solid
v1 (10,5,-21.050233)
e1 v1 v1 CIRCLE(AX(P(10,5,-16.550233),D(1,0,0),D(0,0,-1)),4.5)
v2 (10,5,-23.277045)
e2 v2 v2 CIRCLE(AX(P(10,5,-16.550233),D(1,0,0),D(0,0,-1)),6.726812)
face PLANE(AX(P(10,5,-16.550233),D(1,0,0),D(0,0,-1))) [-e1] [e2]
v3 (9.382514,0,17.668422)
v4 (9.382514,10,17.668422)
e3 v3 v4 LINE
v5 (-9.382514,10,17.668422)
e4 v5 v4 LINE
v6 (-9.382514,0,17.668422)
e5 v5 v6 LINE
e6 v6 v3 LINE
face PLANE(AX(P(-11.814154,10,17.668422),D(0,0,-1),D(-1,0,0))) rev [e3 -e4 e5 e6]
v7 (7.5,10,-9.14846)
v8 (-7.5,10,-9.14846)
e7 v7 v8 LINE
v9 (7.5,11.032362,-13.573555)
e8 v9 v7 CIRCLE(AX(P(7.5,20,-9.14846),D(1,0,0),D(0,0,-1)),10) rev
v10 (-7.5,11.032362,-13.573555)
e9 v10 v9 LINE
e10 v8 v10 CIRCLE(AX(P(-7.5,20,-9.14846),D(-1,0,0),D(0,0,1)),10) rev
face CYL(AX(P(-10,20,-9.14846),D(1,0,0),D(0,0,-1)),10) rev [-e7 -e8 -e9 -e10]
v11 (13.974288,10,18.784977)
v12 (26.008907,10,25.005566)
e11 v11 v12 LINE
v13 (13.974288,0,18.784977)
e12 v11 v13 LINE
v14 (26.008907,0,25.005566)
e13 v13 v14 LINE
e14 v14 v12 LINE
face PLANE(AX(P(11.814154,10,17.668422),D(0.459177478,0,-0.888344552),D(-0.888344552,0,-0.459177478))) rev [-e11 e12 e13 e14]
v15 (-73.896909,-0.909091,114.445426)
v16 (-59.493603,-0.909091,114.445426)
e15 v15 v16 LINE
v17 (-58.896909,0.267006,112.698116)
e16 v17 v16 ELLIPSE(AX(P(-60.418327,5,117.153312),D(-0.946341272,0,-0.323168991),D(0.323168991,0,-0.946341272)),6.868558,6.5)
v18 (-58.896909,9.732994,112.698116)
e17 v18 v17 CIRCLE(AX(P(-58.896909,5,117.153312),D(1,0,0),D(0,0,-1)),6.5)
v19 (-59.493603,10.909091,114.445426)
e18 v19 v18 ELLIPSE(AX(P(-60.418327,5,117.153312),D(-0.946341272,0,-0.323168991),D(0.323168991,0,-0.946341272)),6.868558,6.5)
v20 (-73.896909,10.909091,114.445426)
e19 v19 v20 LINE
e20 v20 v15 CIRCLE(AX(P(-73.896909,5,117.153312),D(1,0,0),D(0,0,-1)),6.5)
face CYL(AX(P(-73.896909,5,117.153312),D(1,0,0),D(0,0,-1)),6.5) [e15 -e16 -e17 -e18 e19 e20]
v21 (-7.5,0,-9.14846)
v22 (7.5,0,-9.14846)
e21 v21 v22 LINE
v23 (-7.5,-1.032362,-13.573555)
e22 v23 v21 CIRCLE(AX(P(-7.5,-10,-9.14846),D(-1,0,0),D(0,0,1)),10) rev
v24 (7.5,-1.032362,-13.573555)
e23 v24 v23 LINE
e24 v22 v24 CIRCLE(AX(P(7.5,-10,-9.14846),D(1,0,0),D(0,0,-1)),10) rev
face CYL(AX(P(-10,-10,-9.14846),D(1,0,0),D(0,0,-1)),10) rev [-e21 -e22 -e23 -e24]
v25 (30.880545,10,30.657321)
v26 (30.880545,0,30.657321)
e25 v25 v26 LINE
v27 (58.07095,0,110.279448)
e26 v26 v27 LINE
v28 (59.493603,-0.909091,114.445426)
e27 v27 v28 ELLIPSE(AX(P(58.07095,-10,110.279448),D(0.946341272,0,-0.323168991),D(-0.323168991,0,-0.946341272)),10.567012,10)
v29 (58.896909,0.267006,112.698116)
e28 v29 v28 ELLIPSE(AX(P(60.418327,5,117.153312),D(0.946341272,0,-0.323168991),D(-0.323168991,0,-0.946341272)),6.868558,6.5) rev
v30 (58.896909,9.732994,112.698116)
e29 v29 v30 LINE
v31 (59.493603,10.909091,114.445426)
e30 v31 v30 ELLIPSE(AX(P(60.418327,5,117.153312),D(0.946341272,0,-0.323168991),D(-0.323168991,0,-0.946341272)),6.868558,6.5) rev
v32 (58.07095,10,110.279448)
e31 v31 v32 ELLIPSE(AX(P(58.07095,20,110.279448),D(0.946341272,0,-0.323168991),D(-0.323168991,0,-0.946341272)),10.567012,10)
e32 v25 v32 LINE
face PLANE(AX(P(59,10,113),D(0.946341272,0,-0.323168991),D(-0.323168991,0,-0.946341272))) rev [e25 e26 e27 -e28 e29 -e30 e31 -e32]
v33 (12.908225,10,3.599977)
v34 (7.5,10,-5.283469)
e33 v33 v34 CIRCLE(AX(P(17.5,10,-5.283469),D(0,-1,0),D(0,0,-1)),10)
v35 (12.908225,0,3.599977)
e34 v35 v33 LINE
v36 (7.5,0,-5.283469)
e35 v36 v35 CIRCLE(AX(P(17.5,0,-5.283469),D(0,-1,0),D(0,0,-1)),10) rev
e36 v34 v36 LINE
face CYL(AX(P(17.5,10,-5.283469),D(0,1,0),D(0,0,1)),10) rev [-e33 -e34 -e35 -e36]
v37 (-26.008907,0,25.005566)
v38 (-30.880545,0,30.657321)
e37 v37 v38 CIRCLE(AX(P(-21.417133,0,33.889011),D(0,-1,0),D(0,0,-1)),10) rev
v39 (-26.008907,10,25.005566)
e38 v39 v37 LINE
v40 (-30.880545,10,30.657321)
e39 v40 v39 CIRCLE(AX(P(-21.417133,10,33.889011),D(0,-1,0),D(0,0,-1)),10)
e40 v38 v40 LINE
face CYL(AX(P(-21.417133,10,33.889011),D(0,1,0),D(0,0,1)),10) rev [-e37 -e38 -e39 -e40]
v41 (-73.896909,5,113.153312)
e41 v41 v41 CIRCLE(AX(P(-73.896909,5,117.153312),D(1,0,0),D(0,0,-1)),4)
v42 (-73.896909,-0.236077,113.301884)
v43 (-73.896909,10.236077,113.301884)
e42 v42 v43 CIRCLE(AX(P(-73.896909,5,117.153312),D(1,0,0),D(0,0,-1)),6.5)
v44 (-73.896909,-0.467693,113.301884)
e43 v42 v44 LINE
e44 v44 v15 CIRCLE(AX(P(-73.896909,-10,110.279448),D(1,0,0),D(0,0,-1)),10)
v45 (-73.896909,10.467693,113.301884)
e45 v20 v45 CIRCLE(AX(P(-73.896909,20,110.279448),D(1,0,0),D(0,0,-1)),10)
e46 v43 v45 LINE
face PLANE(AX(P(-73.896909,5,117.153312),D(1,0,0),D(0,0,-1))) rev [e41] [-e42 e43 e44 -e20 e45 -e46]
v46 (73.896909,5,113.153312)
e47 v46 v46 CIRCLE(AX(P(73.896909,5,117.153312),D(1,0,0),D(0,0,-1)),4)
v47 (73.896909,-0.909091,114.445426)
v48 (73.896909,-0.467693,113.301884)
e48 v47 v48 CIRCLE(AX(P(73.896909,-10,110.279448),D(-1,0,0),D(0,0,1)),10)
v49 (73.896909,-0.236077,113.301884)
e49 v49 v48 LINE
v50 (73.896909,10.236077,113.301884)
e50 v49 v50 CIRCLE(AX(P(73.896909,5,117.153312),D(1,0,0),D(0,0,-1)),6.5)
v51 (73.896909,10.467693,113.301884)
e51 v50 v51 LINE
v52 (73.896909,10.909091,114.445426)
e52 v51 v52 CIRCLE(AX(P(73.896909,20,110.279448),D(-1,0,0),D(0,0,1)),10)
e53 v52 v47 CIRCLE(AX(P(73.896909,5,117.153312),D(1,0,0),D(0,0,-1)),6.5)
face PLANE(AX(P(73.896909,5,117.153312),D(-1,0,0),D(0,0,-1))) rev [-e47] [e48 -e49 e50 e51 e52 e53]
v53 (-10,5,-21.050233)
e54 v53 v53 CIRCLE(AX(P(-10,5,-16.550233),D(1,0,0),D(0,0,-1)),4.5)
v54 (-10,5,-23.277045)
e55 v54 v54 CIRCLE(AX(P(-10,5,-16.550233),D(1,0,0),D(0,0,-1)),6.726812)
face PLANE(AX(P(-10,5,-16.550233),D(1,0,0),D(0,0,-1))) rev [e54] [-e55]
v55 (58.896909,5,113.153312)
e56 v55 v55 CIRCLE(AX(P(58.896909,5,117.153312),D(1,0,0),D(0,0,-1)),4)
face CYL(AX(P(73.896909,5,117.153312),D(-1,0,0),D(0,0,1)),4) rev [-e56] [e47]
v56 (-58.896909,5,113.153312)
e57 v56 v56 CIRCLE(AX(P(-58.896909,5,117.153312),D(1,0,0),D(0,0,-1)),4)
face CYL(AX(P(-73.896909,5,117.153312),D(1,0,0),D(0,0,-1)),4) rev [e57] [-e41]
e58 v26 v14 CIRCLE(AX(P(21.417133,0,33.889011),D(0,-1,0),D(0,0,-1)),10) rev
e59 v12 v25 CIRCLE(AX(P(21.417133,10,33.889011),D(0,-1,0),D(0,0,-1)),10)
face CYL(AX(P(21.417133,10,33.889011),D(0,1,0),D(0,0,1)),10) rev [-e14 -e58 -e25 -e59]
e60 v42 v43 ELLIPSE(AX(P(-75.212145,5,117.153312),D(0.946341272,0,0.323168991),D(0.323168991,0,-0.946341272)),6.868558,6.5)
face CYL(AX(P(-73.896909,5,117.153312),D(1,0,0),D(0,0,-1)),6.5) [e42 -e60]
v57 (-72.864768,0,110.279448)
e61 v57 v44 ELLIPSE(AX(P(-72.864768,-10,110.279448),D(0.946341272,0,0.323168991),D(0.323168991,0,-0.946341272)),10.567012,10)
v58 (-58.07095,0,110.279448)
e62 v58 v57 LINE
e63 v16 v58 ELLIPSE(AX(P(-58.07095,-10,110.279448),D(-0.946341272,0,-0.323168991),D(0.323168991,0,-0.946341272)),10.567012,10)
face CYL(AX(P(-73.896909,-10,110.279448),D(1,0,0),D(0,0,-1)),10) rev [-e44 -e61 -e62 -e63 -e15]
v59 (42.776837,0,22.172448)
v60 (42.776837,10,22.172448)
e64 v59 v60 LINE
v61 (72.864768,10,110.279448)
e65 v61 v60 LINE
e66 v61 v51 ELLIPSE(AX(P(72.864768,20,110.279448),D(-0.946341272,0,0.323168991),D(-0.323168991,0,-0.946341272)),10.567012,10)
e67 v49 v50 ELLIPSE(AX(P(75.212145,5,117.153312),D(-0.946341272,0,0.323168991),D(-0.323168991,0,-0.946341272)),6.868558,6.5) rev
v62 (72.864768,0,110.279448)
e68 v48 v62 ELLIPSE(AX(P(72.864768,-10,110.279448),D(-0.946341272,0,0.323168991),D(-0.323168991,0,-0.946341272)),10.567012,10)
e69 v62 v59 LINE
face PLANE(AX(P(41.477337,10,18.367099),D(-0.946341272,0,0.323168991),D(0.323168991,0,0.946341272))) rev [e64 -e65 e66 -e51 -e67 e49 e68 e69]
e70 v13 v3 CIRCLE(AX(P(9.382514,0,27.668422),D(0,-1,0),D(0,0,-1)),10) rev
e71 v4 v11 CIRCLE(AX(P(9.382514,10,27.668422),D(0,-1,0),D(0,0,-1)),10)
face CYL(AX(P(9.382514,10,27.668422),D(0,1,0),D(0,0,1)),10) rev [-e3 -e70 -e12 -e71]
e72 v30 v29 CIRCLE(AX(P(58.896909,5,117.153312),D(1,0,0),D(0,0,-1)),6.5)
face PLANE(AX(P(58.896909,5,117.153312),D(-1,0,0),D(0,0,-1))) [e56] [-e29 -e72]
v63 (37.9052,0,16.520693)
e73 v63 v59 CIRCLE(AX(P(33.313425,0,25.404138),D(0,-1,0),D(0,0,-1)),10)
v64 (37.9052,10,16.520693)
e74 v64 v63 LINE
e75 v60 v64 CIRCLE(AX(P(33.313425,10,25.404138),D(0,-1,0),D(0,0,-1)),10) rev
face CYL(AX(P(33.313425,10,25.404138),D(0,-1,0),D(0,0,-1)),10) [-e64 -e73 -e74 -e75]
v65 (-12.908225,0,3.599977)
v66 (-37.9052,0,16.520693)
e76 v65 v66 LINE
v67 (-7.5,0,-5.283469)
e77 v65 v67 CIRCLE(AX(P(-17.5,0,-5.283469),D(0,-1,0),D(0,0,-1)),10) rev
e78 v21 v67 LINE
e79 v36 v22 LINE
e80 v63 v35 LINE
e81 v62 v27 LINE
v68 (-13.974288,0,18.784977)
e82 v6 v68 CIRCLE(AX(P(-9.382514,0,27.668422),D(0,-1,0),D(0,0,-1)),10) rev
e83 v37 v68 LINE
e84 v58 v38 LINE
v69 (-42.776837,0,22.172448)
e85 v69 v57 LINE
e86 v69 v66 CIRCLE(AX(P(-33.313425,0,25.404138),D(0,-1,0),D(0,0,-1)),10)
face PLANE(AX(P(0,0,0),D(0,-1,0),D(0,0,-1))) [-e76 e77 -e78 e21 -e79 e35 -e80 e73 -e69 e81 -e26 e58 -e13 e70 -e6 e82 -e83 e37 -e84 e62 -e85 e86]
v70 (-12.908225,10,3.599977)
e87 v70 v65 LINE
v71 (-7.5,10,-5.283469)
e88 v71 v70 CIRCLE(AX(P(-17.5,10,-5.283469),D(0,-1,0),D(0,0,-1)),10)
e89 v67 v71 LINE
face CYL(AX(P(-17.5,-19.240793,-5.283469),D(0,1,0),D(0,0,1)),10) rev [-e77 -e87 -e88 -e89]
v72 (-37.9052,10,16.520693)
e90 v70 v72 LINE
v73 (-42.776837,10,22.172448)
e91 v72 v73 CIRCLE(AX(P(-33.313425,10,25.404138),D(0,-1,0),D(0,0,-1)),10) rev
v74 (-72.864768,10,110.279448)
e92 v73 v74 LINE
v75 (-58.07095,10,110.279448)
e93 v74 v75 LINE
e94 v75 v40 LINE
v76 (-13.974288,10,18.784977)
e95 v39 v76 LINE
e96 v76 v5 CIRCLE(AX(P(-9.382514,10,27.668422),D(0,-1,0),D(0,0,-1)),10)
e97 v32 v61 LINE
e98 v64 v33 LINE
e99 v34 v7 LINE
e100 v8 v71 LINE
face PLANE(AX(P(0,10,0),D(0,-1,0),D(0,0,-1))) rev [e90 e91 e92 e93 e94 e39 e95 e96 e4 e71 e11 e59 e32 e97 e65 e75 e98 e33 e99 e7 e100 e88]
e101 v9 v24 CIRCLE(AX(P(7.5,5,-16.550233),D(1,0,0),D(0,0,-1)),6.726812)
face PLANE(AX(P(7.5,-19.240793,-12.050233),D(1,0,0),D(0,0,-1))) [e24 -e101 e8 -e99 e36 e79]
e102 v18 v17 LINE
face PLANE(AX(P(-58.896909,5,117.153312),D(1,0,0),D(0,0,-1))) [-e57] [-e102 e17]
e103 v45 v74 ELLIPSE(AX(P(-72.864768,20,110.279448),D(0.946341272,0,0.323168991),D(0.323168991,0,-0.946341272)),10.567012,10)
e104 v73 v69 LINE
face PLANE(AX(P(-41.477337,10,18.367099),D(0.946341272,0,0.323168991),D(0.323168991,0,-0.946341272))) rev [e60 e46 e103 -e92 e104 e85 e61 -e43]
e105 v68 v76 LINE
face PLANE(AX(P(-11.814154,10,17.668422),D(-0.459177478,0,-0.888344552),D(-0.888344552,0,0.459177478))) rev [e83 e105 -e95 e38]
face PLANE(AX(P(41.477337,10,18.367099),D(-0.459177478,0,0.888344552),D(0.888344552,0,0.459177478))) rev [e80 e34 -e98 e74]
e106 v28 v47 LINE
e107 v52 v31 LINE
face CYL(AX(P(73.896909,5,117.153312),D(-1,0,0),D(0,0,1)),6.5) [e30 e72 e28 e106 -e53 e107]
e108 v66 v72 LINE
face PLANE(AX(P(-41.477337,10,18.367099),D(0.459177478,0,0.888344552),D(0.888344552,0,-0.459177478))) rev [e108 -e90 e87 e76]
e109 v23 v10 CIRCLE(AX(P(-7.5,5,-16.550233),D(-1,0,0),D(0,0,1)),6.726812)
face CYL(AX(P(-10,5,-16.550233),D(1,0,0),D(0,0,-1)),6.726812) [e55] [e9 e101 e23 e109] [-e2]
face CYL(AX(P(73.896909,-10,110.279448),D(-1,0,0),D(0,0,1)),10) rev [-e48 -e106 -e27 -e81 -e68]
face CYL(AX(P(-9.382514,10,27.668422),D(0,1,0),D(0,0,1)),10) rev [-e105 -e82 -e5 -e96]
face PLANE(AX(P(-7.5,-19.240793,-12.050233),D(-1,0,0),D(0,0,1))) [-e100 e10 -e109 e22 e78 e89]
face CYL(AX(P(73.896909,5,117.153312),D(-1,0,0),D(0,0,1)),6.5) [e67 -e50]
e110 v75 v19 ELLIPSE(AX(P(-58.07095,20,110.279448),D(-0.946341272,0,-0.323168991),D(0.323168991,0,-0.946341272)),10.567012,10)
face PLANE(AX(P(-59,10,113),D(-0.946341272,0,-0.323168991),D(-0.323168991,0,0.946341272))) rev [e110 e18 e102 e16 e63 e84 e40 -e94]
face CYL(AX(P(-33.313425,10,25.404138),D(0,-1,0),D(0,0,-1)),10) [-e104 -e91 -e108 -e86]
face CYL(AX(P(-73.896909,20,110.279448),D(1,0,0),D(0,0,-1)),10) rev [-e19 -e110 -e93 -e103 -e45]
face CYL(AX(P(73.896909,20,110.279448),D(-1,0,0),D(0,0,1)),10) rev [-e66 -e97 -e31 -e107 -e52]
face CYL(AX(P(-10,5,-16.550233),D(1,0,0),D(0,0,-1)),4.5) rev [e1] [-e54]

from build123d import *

# Parameters (mm, degrees)
BOSS_EXTRUDE1_DEPTH      = 10
SKETCH3_R                = 6.5
SKETCH3_R_2              = 4
BOSS_EXTRUDE3_DEPTH      = 7.5
SKETCH7_W                = 15
SKETCH7_H                = 12.050233058
BOSS_EXTRUDE4_DEPTH      = 10
BOSS_EXTRUDE5_DEPTH      = 10
BOSS_EXTRUDE5_DEPTH_BACK = 10
SKETCH9_R                = 6.726812024
SKETCH9_R_2              = 4.5
FILLET1_R                = 10
FILLET2_R                = 10
FILLET3_R                = 10
FILLET4_R                = 10


with BuildPart() as part:
    # Sketch1 → Boss-Extrude1 (new body)
    with BuildSketch(Plane(origin=(0, 0, 0), x_dir=(1, 0, 0), z_dir=(0, 1, 0))):
        Polygon((-11.814153955, -17.668422436), (-29.581045004, -26.851971991), (-59, -113), (-73.793817424, -113), (-41.477337097, -18.36709911), (-5.943554998, 0), (5.943554998, 0), (41.477337097, -18.36709911), (73.793817424, -113), (59, -113), (29.581045004, -26.851971991), (11.814153955, -17.668422436), align=None)
    extrude(amount=BOSS_EXTRUDE1_DEPTH)

    # Sketch3 → Boss-Extrude3 (add, symmetric)
    with BuildSketch(Plane(origin=(-66.396908712, 0, 0), x_dir=(0, 0, -1), z_dir=(1, 0, 0))):
        with Locations((-117.153311931, 5)):
            Circle(SKETCH3_R)
        with Locations((-117.153311931, 5)):
            Circle(SKETCH3_R_2, mode=Mode.SUBTRACT)
    boss_extrude3 = extrude(amount=BOSS_EXTRUDE3_DEPTH, both=True)

    # Mirror3: Boss-Extrude3 across plane
    add(boss_extrude3.mirror(Plane(origin=(0, 0, 0), x_dir=(0, 0, 1), z_dir=(1, 0, 0))))

    # Sketch7 → Boss-Extrude4 (add)
    with BuildSketch(Plane(origin=(0, 10, 0), x_dir=(1, 0, 0), z_dir=(0, 1, 0))):
        with Locations((0, 6.025116529)):
            Rectangle(SKETCH7_W, SKETCH7_H)
    extrude(amount=-BOSS_EXTRUDE4_DEPTH)

    # Sketch9 → Boss-Extrude5 (add, two sides: drawn at the far end of the back side and taken through both)
    with BuildSketch(Plane(origin=(0, 0, 0), x_dir=(0, 0, -1), z_dir=(1, 0, 0)).offset(-BOSS_EXTRUDE5_DEPTH_BACK)):
        with Locations((16.550233058, 5)):
            Circle(SKETCH9_R)
        with Locations((16.550233058, 5)):
            Circle(SKETCH9_R_2, mode=Mode.SUBTRACT)
    extrude(amount=BOSS_EXTRUDE5_DEPTH + BOSS_EXTRUDE5_DEPTH_BACK)

    # Fillet1
    # the kernel refuses this fillet: 10 mm, written as the material it adds along each edge
    with BuildSketch(Plane(origin=(-5.943554998, 0, 0), x_dir=(-0.88834455248328, 0, 0.4591774777504672), z_dir=(0, 1, 0))) as fillet1_piece_1:
        with BuildLine():
            CenterArc((5.095194407, -10), FILLET1_R, 90, 21.792944461)
            Line((1.382659439, -0.71468449), (0, 0))
            Line((0, 0), (5.095194407, 0))
        make_face()
    extrude(amount=10)

    # Fillet2
    # the kernel refuses this fillet: 10 mm, written as the material it adds along each edge
    with BuildSketch(Plane(origin=(5.943554998, 0, 0), x_dir=(0.8883445524832799, 0, 0.4591774777504676), z_dir=(0, 1, 0))) as fillet2_piece_1:
        with BuildLine():
            CenterArc((5.095194407, 10), FILLET2_R, 248.207055539, 21.792944461)
            Line((1.382659439, 0.71468449), (0, 0))
            Line((0, 0), (5.095194407, 0))
        make_face()
    extrude(amount=10)

    # Fillet3
    # the kernel refuses this fillet: 10 mm, written as the material it adds along each edge
    with BuildSketch(Plane(origin=(11.814153955, 0, 17.668422436), x_dir=(0.8883445524832799, 0, 0.4591774777504676), z_dir=(0, 1, 0)), Plane(origin=(-11.814153955, 0, 17.668422436), x_dir=(1, 0, 0), z_dir=(0, 1, 0))) as fillet3_piece_1:
        with BuildLine():
            CenterArc((FILLET3_R * 0.243164033357, -FILLET3_R), FILLET3_R, 90, 27.334044372)
            Line((-FILLET3_R * 0.216013444393, -FILLET3_R * 0.111655447517), (0, 0))
            Line((0, 0), (FILLET3_R * 0.243164033357, 0))
        make_face()
    extrude(amount=10)
    with BuildSketch(Plane(origin=(29.581045004, 0, 26.851971991), x_dir=(0.3231689910588884, 0, 0.946341272067313), z_dir=(0, 1, 0)), Plane(origin=(-29.581045004, 0, 26.851971991), x_dir=(0.8883445524832806, 0, -0.4591774777504663), z_dir=(0, 1, 0))) as fillet3_piece_2:
        with BuildLine():
            CenterArc((FILLET3_R * 0.402111719604, -FILLET3_R), FILLET3_R, 90, 43.811274916)
            Line((-FILLET3_R * 0.290173472026, -FILLET3_R * 0.278375988862), (0, 0))
            Line((0, 0), (FILLET3_R * 0.402111719604, 0))
        make_face()
    extrude(amount=10)
    with BuildSketch(Plane(origin=(-52.198620973, 10, 113), x_dir=(0, 0, -1), z_dir=(-1, 0, 0))) as fillet3_piece_3_section:
        with BuildLine():
            CenterArc((2.720551611, -10), FILLET3_R, 90, 24.619977329)
            ThreePointArc((-1.445426294, -0.909090909), (-0.692731114, -0.502215954), (0, 0))
            Line((0, 0), (2.720551611, 0))
        make_face()
    fillet3_piece_3 = extrude(amount=28.396575479, mode=Mode.PRIVATE)
    fillet3_piece_3 = split(fillet3_piece_3, bisect_by=Plane(origin=(-58.289676239, 10, 110.919946807), z_dir=(-0.9463412720673133, 0, -0.3231689910588876)), keep=Keep.TOP, mode=Mode.PRIVATE)
    fillet3_piece_3 = split(fillet3_piece_3, bisect_by=Plane(origin=(-71.538454048, 10, 106.395580932), z_dir=(0.9463412720673133, 0, 0.3231689910588875)), keep=Keep.TOP, mode=Mode.PRIVATE)
    fillet3_piece_3 = split(fillet3_piece_3, bisect_by=Plane(origin=(-73.896908712, 10, 113), z_dir=(1, 0, 0)), keep=Keep.TOP, mode=Mode.PRIVATE)
    add(fillet3_piece_3)
    with BuildSketch(Plane(origin=(80.595196452, 10, 113), x_dir=(0, 0, -1), z_dir=(-1, 0, 0))) as fillet3_piece_4_section:
        with BuildLine():
            CenterArc((2.720551611, -10), FILLET3_R, 90, 24.619977329)
            ThreePointArc((-1.445426294, -0.909090909), (-0.692731114, -0.502215954), (0, 0))
            Line((0, 0), (2.720551611, 0))
        make_face()
    fillet3_piece_4 = extrude(amount=28.396575479, mode=Mode.PRIVATE)
    fillet3_piece_4 = split(fillet3_piece_4, bisect_by=Plane(origin=(74.504141186, 10, 115.080053193), z_dir=(-0.9463412720673132, 0, 0.32316899105888797)), keep=Keep.TOP, mode=Mode.PRIVATE)
    fillet3_piece_4 = split(fillet3_piece_4, bisect_by=Plane(origin=(61.255363377, 10, 119.604419068), z_dir=(0.9463412720673132, 0, -0.32316899105888797)), keep=Keep.TOP, mode=Mode.PRIVATE)
    fillet3_piece_4 = split(fillet3_piece_4, bisect_by=Plane(origin=(73.896908712, 10, 113), z_dir=(-1, 0, 0)), keep=Keep.TOP, mode=Mode.PRIVATE)
    add(fillet3_piece_4)
    with BuildSketch(Plane(origin=(80.595196452, 0, 113), x_dir=(0, 0, -1), z_dir=(-1, 0, 0))) as fillet3_piece_5_section:
        with BuildLine():
            CenterArc((2.720551611, 10), FILLET3_R, 245.380022671, 24.619977329)
            ThreePointArc((-1.445426294, 0.909090909), (-0.692731114, 0.502215954), (0, 0))
            Line((0, 0), (2.720551611, 0))
        make_face()
    fillet3_piece_5 = extrude(amount=28.396575479, mode=Mode.PRIVATE)
    fillet3_piece_5 = split(fillet3_piece_5, bisect_by=Plane(origin=(74.504141186, 0, 115.080053193), z_dir=(-0.9463412720673132, 0, 0.32316899105888797)), keep=Keep.TOP, mode=Mode.PRIVATE)
    fillet3_piece_5 = split(fillet3_piece_5, bisect_by=Plane(origin=(61.255363377, 0, 119.604419068), z_dir=(0.9463412720673132, 0, -0.32316899105888797)), keep=Keep.TOP, mode=Mode.PRIVATE)
    fillet3_piece_5 = split(fillet3_piece_5, bisect_by=Plane(origin=(73.896908712, 0, 113), z_dir=(-1, 0, 0)), keep=Keep.TOP, mode=Mode.PRIVATE)
    add(fillet3_piece_5)
    with BuildSketch(Plane(origin=(-52.198620973, 0, 113), x_dir=(0, 0, -1), z_dir=(-1, 0, 0))) as fillet3_piece_6_section:
        with BuildLine():
            CenterArc((2.720551611, 10), FILLET3_R, 245.380022671, 24.619977329)
            ThreePointArc((-1.445426294, 0.909090909), (-0.692731114, 0.502215954), (0, 0))
            Line((0, 0), (2.720551611, 0))
        make_face()
    fillet3_piece_6 = extrude(amount=28.396575479, mode=Mode.PRIVATE)
    fillet3_piece_6 = split(fillet3_piece_6, bisect_by=Plane(origin=(-58.289676239, 0, 110.919946807), z_dir=(-0.9463412720673133, 0, -0.3231689910588876)), keep=Keep.TOP, mode=Mode.PRIVATE)
    fillet3_piece_6 = split(fillet3_piece_6, bisect_by=Plane(origin=(-71.538454048, 0, 106.395580932), z_dir=(0.9463412720673133, 0, 0.3231689910588875)), keep=Keep.TOP, mode=Mode.PRIVATE)
    fillet3_piece_6 = split(fillet3_piece_6, bisect_by=Plane(origin=(-73.896908712, 0, 113), z_dir=(1, 0, 0)), keep=Keep.TOP, mode=Mode.PRIVATE)
    add(fillet3_piece_6)
    with BuildSketch(Plane(origin=(-7.5, 10, 0), x_dir=(-0.8324412912652444, 0, 0.5541132525004725), z_dir=(0, -1, 0))) as fillet3_piece_7:
        with BuildLine():
            CenterArc((5.396772828, 9.93931012), FILLET3_R, 213.649659515, 62.665955628)
            Line((-2.927640085, 4.398177595), (-3.760081376, 3.844064343))
            Line((-3.760081376, 3.844064343), (-0.832441291, -0.554113253))
            Line((-0.832441291, -0.554113253), (-0.266857068, -0.963736118))
            ThreePointArc((-0.266857068, -0.963736118), (3.878627843, -1.295879951), (6.606829993, -0.993931012))
            Line((6.606829993, -0.993931012), (6.496824796, 0))
        make_face()
    extrude(amount=10)
    with BuildSketch(Plane(origin=(7.5, 10, 0), x_dir=(0.832441291265244, 0, 0.5541132525004732), z_dir=(0, -1, 0))) as fillet3_piece_8:
        with BuildLine():
            CenterArc((5.396772828, -9.93931012), FILLET3_R, 83.684384857, 62.665955628)
            Line((-2.927640085, -4.398177595), (-3.760081376, -3.844064343))
            Line((-3.760081376, -3.844064343), (-0.832441291, 0.554113253))
            Line((-0.832441291, 0.554113253), (-0.266857068, 0.963736118))
            ThreePointArc((-0.266857068, 0.963736118), (3.878627843, 1.295879951), (6.606829993, 0.993931012))
            Line((6.606829993, 0.993931012), (6.496824796, 0))
        make_face()
    extrude(amount=10)
    # the kernel refuses this fillet: 10 mm, written as the material it takes off along each edge
    with BuildSketch(Plane(origin=(41.477337097, -10.05279299, 18.36709911), x_dir=(0.3231689910588881, 0, 0.9463412720673132), z_dir=(0, 1, 0)), Plane(origin=(-41.477337097, -10.05279299, 18.36709911), x_dir=(0.8883445524832805, 0, -0.4591774777504667), z_dir=(0, 1, 0))) as fillet3_2_piece_1:
        with BuildLine():
            CenterArc((FILLET3_R * 0.402111719604, -FILLET3_R), FILLET3_R, 90, 43.811274916)
            Line((-FILLET3_R * 0.290173472026, -FILLET3_R * 0.278375988862), (0, 0))
            Line((0, 0), (FILLET3_R * 0.402111719604, 0))
        make_face()
    extrude(amount=30.10558598, mode=Mode.SUBTRACT)

    # Fillet4
    fillet4_edges = [part.edges().sort_by_distance(p)[0] for p in [
        (0, 10, -12.050233058),
        (0, 0, -12.050233058),
    ]]
    fillet(fillet4_edges, radius=FILLET4_R)


solid = part.part
